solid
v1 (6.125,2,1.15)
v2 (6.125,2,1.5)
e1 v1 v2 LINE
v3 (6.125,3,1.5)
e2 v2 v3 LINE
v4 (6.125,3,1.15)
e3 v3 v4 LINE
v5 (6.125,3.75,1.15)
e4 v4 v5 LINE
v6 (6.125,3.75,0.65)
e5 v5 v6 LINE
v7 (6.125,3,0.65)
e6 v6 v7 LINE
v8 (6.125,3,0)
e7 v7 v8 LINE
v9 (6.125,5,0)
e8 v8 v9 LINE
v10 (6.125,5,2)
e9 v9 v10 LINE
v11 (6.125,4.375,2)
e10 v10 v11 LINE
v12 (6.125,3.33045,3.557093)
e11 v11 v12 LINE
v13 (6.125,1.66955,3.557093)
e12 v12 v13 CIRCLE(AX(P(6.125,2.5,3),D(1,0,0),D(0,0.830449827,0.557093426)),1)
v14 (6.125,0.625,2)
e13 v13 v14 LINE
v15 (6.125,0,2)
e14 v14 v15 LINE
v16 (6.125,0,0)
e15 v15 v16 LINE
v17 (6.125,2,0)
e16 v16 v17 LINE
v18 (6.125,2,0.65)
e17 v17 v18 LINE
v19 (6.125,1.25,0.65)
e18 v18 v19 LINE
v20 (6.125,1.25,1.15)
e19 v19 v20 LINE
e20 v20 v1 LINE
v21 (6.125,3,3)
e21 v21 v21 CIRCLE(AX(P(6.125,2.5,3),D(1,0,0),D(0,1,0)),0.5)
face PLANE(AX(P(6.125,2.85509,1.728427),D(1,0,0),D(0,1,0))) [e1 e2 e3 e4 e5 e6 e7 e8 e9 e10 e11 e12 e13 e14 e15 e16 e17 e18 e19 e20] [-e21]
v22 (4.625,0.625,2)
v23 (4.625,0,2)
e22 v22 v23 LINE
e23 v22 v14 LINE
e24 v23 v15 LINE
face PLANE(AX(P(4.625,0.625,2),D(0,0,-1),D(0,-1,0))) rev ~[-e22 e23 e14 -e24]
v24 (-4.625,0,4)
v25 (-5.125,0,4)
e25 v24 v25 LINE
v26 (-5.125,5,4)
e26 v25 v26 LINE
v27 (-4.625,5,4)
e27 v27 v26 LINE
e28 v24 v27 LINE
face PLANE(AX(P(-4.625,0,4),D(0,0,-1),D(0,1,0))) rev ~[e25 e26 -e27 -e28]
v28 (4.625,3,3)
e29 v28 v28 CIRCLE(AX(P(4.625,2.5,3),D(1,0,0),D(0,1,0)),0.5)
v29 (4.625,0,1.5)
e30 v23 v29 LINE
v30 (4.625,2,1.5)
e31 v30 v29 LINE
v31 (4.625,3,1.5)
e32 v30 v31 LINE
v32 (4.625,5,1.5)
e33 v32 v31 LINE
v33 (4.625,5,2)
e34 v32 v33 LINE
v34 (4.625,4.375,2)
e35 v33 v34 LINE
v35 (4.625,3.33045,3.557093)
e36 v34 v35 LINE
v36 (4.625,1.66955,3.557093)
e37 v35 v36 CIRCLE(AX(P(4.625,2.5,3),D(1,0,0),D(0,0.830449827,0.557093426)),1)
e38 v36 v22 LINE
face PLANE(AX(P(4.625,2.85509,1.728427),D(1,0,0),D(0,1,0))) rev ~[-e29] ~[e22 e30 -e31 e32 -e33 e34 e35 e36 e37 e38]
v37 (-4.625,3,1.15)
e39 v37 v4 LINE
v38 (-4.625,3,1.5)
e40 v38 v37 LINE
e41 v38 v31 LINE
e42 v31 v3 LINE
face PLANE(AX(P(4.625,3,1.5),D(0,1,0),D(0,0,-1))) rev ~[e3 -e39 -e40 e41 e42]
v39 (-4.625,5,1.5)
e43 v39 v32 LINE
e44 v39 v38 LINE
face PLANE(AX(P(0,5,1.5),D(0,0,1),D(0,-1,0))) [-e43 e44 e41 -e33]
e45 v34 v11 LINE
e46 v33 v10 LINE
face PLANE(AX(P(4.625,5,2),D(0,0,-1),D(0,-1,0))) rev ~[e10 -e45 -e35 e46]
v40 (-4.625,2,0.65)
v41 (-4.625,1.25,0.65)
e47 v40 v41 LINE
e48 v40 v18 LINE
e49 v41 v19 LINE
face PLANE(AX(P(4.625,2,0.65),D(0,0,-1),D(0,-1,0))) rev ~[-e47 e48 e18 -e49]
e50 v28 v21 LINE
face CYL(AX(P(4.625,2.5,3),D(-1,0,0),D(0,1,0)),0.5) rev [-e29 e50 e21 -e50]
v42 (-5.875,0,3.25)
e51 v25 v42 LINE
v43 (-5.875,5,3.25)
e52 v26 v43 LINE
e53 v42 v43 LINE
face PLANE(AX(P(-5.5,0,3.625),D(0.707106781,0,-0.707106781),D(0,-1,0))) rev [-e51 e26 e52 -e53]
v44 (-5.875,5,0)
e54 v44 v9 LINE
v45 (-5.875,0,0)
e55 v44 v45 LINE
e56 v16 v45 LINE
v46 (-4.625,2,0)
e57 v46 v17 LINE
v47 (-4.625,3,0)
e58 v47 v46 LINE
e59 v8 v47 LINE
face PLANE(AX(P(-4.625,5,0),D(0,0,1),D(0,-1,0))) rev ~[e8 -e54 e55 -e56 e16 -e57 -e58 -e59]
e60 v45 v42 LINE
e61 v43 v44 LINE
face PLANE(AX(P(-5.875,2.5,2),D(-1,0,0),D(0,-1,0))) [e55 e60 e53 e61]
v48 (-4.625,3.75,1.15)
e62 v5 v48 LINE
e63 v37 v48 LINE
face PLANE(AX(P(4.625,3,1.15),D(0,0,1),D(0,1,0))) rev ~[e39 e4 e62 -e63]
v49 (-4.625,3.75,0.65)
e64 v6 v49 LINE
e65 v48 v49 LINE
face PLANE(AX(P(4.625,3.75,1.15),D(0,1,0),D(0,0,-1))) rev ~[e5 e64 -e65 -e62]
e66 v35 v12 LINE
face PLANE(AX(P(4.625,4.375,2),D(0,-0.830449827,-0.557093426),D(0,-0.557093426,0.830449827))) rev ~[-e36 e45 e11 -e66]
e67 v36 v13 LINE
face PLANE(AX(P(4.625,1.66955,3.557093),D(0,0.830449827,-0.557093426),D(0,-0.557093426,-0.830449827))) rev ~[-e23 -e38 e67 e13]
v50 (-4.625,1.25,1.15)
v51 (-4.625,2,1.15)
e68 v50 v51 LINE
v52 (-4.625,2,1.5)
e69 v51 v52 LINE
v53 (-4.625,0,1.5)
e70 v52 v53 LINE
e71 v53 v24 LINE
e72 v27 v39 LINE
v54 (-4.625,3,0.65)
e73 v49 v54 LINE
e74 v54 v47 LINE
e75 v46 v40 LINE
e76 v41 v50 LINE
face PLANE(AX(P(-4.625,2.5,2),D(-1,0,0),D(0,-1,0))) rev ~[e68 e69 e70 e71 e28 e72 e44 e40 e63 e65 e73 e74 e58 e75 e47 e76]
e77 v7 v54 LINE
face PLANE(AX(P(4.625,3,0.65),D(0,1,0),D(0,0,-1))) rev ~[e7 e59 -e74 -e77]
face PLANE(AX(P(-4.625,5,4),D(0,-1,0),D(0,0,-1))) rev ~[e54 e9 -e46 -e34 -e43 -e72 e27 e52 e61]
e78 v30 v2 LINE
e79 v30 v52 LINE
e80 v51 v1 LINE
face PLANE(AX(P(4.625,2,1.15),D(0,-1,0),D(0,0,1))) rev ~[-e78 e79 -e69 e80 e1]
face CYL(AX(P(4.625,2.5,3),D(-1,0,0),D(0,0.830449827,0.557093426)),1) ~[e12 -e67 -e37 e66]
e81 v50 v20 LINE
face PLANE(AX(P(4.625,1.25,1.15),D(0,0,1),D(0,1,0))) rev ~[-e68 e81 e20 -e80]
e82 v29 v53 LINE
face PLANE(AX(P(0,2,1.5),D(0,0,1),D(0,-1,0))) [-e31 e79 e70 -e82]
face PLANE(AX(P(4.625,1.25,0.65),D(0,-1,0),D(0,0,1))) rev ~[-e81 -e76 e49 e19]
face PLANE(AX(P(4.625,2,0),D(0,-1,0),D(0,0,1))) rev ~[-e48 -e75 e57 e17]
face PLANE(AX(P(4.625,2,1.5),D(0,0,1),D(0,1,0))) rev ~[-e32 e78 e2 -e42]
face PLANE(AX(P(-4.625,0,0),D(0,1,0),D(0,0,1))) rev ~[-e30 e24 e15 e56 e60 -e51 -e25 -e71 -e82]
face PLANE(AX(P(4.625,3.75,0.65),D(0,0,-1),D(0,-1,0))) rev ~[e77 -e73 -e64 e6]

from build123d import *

# Parameters (mm, degrees)
F1_DEPTH = 4.625
F2_R     = 0.5
F3_DEPTH = 1.5
F5_DEPTH = 1.25
F6_SIZE2 = 0.75
F6_SIZE  = 0.75


with BuildPart() as f1:
    # F0 (on Right) → F1 (new body, symmetric)
    with BuildSketch(Plane.YZ):
        Polygon((0, 1.5), (0, 0), (2, 0), (2, 0.65), (1.25, 0.65), (1.25, 1.15), (2, 1.15), (2, 1.5), align=None)
    extrude(amount=F1_DEPTH, both=True)



with BuildPart() as f1b:
    # F0 (on Right) → F1, piece 2 (new body, symmetric)
    with BuildSketch(Plane.YZ):
        Polygon((3, 0.65), (3, 0), (5, 0), (5, 1.5), (3, 1.5), (3, 1.15), (3.75, 1.15), (3.75, 0.65), align=None)
    extrude(amount=F1_DEPTH, both=True)


with BuildPart() as f1_1:
    add(f1.part)

    add(f1b.part)  # F3 merges F1b
    # F2 (on face) → F3 (join)
    with BuildSketch(Plane.YZ.offset(4.625)):
        with BuildLine():
            Line((0, 2), (0, 1.5))
            Line((0, 1.5), (2, 1.5))
            Line((2, 1.5), (3, 1.5))
            Line((3, 1.5), (3, 1.15))
            Line((3, 1.15), (3.75, 1.15))
            Line((3.75, 1.15), (3.75, 0.65))
            Line((3.75, 0.65), (3, 0.65))
            Line((3, 0.65), (3, 0))
            Line((3, 0), (5, 0))
            Line((5, 0), (5, 2))
            Line((5, 2), (4.375, 2))
            Line((4.375, 2), (3.330449827, 3.5570934256))
            ThreePointArc((3.330449827, 3.5570934256), (2.5, 4), (1.669550173, 3.5570934256))
            Line((1.669550173, 3.5570934256), (0.625, 2))
            Line((0.625, 2), (0, 2))
        make_face()
        with Locations((2.5, 3)):
            Circle(F2_R, mode=Mode.SUBTRACT)
        Polygon((0, 1.5), (0, 0), (2, 0), (2, 0.65), (1.25, 0.65), (1.25, 1.15), (2, 1.15), (2, 1.5), align=None)
    extrude(amount=F3_DEPTH)

    # F4 (on face) → F5 (join)
    with BuildSketch(Plane(origin=(-4.625, 0, 0), x_dir=(0, -1, 0), z_dir=(-1, 0, 0))):
        Polygon((-5, 1.5), (-5, 0), (0, 0), (0, 4), (-5, 4), align=None)
    extrude(amount=F5_DEPTH)

    # F6
    f6_edges = [f1_1.edges().sort_by_distance(p)[0] for p in [
        (-5.875, 2.5, 4),
    ]]
    chamfer(f6_edges, length=F6_SIZE, length2=F6_SIZE2)


solid = f1_1.part
